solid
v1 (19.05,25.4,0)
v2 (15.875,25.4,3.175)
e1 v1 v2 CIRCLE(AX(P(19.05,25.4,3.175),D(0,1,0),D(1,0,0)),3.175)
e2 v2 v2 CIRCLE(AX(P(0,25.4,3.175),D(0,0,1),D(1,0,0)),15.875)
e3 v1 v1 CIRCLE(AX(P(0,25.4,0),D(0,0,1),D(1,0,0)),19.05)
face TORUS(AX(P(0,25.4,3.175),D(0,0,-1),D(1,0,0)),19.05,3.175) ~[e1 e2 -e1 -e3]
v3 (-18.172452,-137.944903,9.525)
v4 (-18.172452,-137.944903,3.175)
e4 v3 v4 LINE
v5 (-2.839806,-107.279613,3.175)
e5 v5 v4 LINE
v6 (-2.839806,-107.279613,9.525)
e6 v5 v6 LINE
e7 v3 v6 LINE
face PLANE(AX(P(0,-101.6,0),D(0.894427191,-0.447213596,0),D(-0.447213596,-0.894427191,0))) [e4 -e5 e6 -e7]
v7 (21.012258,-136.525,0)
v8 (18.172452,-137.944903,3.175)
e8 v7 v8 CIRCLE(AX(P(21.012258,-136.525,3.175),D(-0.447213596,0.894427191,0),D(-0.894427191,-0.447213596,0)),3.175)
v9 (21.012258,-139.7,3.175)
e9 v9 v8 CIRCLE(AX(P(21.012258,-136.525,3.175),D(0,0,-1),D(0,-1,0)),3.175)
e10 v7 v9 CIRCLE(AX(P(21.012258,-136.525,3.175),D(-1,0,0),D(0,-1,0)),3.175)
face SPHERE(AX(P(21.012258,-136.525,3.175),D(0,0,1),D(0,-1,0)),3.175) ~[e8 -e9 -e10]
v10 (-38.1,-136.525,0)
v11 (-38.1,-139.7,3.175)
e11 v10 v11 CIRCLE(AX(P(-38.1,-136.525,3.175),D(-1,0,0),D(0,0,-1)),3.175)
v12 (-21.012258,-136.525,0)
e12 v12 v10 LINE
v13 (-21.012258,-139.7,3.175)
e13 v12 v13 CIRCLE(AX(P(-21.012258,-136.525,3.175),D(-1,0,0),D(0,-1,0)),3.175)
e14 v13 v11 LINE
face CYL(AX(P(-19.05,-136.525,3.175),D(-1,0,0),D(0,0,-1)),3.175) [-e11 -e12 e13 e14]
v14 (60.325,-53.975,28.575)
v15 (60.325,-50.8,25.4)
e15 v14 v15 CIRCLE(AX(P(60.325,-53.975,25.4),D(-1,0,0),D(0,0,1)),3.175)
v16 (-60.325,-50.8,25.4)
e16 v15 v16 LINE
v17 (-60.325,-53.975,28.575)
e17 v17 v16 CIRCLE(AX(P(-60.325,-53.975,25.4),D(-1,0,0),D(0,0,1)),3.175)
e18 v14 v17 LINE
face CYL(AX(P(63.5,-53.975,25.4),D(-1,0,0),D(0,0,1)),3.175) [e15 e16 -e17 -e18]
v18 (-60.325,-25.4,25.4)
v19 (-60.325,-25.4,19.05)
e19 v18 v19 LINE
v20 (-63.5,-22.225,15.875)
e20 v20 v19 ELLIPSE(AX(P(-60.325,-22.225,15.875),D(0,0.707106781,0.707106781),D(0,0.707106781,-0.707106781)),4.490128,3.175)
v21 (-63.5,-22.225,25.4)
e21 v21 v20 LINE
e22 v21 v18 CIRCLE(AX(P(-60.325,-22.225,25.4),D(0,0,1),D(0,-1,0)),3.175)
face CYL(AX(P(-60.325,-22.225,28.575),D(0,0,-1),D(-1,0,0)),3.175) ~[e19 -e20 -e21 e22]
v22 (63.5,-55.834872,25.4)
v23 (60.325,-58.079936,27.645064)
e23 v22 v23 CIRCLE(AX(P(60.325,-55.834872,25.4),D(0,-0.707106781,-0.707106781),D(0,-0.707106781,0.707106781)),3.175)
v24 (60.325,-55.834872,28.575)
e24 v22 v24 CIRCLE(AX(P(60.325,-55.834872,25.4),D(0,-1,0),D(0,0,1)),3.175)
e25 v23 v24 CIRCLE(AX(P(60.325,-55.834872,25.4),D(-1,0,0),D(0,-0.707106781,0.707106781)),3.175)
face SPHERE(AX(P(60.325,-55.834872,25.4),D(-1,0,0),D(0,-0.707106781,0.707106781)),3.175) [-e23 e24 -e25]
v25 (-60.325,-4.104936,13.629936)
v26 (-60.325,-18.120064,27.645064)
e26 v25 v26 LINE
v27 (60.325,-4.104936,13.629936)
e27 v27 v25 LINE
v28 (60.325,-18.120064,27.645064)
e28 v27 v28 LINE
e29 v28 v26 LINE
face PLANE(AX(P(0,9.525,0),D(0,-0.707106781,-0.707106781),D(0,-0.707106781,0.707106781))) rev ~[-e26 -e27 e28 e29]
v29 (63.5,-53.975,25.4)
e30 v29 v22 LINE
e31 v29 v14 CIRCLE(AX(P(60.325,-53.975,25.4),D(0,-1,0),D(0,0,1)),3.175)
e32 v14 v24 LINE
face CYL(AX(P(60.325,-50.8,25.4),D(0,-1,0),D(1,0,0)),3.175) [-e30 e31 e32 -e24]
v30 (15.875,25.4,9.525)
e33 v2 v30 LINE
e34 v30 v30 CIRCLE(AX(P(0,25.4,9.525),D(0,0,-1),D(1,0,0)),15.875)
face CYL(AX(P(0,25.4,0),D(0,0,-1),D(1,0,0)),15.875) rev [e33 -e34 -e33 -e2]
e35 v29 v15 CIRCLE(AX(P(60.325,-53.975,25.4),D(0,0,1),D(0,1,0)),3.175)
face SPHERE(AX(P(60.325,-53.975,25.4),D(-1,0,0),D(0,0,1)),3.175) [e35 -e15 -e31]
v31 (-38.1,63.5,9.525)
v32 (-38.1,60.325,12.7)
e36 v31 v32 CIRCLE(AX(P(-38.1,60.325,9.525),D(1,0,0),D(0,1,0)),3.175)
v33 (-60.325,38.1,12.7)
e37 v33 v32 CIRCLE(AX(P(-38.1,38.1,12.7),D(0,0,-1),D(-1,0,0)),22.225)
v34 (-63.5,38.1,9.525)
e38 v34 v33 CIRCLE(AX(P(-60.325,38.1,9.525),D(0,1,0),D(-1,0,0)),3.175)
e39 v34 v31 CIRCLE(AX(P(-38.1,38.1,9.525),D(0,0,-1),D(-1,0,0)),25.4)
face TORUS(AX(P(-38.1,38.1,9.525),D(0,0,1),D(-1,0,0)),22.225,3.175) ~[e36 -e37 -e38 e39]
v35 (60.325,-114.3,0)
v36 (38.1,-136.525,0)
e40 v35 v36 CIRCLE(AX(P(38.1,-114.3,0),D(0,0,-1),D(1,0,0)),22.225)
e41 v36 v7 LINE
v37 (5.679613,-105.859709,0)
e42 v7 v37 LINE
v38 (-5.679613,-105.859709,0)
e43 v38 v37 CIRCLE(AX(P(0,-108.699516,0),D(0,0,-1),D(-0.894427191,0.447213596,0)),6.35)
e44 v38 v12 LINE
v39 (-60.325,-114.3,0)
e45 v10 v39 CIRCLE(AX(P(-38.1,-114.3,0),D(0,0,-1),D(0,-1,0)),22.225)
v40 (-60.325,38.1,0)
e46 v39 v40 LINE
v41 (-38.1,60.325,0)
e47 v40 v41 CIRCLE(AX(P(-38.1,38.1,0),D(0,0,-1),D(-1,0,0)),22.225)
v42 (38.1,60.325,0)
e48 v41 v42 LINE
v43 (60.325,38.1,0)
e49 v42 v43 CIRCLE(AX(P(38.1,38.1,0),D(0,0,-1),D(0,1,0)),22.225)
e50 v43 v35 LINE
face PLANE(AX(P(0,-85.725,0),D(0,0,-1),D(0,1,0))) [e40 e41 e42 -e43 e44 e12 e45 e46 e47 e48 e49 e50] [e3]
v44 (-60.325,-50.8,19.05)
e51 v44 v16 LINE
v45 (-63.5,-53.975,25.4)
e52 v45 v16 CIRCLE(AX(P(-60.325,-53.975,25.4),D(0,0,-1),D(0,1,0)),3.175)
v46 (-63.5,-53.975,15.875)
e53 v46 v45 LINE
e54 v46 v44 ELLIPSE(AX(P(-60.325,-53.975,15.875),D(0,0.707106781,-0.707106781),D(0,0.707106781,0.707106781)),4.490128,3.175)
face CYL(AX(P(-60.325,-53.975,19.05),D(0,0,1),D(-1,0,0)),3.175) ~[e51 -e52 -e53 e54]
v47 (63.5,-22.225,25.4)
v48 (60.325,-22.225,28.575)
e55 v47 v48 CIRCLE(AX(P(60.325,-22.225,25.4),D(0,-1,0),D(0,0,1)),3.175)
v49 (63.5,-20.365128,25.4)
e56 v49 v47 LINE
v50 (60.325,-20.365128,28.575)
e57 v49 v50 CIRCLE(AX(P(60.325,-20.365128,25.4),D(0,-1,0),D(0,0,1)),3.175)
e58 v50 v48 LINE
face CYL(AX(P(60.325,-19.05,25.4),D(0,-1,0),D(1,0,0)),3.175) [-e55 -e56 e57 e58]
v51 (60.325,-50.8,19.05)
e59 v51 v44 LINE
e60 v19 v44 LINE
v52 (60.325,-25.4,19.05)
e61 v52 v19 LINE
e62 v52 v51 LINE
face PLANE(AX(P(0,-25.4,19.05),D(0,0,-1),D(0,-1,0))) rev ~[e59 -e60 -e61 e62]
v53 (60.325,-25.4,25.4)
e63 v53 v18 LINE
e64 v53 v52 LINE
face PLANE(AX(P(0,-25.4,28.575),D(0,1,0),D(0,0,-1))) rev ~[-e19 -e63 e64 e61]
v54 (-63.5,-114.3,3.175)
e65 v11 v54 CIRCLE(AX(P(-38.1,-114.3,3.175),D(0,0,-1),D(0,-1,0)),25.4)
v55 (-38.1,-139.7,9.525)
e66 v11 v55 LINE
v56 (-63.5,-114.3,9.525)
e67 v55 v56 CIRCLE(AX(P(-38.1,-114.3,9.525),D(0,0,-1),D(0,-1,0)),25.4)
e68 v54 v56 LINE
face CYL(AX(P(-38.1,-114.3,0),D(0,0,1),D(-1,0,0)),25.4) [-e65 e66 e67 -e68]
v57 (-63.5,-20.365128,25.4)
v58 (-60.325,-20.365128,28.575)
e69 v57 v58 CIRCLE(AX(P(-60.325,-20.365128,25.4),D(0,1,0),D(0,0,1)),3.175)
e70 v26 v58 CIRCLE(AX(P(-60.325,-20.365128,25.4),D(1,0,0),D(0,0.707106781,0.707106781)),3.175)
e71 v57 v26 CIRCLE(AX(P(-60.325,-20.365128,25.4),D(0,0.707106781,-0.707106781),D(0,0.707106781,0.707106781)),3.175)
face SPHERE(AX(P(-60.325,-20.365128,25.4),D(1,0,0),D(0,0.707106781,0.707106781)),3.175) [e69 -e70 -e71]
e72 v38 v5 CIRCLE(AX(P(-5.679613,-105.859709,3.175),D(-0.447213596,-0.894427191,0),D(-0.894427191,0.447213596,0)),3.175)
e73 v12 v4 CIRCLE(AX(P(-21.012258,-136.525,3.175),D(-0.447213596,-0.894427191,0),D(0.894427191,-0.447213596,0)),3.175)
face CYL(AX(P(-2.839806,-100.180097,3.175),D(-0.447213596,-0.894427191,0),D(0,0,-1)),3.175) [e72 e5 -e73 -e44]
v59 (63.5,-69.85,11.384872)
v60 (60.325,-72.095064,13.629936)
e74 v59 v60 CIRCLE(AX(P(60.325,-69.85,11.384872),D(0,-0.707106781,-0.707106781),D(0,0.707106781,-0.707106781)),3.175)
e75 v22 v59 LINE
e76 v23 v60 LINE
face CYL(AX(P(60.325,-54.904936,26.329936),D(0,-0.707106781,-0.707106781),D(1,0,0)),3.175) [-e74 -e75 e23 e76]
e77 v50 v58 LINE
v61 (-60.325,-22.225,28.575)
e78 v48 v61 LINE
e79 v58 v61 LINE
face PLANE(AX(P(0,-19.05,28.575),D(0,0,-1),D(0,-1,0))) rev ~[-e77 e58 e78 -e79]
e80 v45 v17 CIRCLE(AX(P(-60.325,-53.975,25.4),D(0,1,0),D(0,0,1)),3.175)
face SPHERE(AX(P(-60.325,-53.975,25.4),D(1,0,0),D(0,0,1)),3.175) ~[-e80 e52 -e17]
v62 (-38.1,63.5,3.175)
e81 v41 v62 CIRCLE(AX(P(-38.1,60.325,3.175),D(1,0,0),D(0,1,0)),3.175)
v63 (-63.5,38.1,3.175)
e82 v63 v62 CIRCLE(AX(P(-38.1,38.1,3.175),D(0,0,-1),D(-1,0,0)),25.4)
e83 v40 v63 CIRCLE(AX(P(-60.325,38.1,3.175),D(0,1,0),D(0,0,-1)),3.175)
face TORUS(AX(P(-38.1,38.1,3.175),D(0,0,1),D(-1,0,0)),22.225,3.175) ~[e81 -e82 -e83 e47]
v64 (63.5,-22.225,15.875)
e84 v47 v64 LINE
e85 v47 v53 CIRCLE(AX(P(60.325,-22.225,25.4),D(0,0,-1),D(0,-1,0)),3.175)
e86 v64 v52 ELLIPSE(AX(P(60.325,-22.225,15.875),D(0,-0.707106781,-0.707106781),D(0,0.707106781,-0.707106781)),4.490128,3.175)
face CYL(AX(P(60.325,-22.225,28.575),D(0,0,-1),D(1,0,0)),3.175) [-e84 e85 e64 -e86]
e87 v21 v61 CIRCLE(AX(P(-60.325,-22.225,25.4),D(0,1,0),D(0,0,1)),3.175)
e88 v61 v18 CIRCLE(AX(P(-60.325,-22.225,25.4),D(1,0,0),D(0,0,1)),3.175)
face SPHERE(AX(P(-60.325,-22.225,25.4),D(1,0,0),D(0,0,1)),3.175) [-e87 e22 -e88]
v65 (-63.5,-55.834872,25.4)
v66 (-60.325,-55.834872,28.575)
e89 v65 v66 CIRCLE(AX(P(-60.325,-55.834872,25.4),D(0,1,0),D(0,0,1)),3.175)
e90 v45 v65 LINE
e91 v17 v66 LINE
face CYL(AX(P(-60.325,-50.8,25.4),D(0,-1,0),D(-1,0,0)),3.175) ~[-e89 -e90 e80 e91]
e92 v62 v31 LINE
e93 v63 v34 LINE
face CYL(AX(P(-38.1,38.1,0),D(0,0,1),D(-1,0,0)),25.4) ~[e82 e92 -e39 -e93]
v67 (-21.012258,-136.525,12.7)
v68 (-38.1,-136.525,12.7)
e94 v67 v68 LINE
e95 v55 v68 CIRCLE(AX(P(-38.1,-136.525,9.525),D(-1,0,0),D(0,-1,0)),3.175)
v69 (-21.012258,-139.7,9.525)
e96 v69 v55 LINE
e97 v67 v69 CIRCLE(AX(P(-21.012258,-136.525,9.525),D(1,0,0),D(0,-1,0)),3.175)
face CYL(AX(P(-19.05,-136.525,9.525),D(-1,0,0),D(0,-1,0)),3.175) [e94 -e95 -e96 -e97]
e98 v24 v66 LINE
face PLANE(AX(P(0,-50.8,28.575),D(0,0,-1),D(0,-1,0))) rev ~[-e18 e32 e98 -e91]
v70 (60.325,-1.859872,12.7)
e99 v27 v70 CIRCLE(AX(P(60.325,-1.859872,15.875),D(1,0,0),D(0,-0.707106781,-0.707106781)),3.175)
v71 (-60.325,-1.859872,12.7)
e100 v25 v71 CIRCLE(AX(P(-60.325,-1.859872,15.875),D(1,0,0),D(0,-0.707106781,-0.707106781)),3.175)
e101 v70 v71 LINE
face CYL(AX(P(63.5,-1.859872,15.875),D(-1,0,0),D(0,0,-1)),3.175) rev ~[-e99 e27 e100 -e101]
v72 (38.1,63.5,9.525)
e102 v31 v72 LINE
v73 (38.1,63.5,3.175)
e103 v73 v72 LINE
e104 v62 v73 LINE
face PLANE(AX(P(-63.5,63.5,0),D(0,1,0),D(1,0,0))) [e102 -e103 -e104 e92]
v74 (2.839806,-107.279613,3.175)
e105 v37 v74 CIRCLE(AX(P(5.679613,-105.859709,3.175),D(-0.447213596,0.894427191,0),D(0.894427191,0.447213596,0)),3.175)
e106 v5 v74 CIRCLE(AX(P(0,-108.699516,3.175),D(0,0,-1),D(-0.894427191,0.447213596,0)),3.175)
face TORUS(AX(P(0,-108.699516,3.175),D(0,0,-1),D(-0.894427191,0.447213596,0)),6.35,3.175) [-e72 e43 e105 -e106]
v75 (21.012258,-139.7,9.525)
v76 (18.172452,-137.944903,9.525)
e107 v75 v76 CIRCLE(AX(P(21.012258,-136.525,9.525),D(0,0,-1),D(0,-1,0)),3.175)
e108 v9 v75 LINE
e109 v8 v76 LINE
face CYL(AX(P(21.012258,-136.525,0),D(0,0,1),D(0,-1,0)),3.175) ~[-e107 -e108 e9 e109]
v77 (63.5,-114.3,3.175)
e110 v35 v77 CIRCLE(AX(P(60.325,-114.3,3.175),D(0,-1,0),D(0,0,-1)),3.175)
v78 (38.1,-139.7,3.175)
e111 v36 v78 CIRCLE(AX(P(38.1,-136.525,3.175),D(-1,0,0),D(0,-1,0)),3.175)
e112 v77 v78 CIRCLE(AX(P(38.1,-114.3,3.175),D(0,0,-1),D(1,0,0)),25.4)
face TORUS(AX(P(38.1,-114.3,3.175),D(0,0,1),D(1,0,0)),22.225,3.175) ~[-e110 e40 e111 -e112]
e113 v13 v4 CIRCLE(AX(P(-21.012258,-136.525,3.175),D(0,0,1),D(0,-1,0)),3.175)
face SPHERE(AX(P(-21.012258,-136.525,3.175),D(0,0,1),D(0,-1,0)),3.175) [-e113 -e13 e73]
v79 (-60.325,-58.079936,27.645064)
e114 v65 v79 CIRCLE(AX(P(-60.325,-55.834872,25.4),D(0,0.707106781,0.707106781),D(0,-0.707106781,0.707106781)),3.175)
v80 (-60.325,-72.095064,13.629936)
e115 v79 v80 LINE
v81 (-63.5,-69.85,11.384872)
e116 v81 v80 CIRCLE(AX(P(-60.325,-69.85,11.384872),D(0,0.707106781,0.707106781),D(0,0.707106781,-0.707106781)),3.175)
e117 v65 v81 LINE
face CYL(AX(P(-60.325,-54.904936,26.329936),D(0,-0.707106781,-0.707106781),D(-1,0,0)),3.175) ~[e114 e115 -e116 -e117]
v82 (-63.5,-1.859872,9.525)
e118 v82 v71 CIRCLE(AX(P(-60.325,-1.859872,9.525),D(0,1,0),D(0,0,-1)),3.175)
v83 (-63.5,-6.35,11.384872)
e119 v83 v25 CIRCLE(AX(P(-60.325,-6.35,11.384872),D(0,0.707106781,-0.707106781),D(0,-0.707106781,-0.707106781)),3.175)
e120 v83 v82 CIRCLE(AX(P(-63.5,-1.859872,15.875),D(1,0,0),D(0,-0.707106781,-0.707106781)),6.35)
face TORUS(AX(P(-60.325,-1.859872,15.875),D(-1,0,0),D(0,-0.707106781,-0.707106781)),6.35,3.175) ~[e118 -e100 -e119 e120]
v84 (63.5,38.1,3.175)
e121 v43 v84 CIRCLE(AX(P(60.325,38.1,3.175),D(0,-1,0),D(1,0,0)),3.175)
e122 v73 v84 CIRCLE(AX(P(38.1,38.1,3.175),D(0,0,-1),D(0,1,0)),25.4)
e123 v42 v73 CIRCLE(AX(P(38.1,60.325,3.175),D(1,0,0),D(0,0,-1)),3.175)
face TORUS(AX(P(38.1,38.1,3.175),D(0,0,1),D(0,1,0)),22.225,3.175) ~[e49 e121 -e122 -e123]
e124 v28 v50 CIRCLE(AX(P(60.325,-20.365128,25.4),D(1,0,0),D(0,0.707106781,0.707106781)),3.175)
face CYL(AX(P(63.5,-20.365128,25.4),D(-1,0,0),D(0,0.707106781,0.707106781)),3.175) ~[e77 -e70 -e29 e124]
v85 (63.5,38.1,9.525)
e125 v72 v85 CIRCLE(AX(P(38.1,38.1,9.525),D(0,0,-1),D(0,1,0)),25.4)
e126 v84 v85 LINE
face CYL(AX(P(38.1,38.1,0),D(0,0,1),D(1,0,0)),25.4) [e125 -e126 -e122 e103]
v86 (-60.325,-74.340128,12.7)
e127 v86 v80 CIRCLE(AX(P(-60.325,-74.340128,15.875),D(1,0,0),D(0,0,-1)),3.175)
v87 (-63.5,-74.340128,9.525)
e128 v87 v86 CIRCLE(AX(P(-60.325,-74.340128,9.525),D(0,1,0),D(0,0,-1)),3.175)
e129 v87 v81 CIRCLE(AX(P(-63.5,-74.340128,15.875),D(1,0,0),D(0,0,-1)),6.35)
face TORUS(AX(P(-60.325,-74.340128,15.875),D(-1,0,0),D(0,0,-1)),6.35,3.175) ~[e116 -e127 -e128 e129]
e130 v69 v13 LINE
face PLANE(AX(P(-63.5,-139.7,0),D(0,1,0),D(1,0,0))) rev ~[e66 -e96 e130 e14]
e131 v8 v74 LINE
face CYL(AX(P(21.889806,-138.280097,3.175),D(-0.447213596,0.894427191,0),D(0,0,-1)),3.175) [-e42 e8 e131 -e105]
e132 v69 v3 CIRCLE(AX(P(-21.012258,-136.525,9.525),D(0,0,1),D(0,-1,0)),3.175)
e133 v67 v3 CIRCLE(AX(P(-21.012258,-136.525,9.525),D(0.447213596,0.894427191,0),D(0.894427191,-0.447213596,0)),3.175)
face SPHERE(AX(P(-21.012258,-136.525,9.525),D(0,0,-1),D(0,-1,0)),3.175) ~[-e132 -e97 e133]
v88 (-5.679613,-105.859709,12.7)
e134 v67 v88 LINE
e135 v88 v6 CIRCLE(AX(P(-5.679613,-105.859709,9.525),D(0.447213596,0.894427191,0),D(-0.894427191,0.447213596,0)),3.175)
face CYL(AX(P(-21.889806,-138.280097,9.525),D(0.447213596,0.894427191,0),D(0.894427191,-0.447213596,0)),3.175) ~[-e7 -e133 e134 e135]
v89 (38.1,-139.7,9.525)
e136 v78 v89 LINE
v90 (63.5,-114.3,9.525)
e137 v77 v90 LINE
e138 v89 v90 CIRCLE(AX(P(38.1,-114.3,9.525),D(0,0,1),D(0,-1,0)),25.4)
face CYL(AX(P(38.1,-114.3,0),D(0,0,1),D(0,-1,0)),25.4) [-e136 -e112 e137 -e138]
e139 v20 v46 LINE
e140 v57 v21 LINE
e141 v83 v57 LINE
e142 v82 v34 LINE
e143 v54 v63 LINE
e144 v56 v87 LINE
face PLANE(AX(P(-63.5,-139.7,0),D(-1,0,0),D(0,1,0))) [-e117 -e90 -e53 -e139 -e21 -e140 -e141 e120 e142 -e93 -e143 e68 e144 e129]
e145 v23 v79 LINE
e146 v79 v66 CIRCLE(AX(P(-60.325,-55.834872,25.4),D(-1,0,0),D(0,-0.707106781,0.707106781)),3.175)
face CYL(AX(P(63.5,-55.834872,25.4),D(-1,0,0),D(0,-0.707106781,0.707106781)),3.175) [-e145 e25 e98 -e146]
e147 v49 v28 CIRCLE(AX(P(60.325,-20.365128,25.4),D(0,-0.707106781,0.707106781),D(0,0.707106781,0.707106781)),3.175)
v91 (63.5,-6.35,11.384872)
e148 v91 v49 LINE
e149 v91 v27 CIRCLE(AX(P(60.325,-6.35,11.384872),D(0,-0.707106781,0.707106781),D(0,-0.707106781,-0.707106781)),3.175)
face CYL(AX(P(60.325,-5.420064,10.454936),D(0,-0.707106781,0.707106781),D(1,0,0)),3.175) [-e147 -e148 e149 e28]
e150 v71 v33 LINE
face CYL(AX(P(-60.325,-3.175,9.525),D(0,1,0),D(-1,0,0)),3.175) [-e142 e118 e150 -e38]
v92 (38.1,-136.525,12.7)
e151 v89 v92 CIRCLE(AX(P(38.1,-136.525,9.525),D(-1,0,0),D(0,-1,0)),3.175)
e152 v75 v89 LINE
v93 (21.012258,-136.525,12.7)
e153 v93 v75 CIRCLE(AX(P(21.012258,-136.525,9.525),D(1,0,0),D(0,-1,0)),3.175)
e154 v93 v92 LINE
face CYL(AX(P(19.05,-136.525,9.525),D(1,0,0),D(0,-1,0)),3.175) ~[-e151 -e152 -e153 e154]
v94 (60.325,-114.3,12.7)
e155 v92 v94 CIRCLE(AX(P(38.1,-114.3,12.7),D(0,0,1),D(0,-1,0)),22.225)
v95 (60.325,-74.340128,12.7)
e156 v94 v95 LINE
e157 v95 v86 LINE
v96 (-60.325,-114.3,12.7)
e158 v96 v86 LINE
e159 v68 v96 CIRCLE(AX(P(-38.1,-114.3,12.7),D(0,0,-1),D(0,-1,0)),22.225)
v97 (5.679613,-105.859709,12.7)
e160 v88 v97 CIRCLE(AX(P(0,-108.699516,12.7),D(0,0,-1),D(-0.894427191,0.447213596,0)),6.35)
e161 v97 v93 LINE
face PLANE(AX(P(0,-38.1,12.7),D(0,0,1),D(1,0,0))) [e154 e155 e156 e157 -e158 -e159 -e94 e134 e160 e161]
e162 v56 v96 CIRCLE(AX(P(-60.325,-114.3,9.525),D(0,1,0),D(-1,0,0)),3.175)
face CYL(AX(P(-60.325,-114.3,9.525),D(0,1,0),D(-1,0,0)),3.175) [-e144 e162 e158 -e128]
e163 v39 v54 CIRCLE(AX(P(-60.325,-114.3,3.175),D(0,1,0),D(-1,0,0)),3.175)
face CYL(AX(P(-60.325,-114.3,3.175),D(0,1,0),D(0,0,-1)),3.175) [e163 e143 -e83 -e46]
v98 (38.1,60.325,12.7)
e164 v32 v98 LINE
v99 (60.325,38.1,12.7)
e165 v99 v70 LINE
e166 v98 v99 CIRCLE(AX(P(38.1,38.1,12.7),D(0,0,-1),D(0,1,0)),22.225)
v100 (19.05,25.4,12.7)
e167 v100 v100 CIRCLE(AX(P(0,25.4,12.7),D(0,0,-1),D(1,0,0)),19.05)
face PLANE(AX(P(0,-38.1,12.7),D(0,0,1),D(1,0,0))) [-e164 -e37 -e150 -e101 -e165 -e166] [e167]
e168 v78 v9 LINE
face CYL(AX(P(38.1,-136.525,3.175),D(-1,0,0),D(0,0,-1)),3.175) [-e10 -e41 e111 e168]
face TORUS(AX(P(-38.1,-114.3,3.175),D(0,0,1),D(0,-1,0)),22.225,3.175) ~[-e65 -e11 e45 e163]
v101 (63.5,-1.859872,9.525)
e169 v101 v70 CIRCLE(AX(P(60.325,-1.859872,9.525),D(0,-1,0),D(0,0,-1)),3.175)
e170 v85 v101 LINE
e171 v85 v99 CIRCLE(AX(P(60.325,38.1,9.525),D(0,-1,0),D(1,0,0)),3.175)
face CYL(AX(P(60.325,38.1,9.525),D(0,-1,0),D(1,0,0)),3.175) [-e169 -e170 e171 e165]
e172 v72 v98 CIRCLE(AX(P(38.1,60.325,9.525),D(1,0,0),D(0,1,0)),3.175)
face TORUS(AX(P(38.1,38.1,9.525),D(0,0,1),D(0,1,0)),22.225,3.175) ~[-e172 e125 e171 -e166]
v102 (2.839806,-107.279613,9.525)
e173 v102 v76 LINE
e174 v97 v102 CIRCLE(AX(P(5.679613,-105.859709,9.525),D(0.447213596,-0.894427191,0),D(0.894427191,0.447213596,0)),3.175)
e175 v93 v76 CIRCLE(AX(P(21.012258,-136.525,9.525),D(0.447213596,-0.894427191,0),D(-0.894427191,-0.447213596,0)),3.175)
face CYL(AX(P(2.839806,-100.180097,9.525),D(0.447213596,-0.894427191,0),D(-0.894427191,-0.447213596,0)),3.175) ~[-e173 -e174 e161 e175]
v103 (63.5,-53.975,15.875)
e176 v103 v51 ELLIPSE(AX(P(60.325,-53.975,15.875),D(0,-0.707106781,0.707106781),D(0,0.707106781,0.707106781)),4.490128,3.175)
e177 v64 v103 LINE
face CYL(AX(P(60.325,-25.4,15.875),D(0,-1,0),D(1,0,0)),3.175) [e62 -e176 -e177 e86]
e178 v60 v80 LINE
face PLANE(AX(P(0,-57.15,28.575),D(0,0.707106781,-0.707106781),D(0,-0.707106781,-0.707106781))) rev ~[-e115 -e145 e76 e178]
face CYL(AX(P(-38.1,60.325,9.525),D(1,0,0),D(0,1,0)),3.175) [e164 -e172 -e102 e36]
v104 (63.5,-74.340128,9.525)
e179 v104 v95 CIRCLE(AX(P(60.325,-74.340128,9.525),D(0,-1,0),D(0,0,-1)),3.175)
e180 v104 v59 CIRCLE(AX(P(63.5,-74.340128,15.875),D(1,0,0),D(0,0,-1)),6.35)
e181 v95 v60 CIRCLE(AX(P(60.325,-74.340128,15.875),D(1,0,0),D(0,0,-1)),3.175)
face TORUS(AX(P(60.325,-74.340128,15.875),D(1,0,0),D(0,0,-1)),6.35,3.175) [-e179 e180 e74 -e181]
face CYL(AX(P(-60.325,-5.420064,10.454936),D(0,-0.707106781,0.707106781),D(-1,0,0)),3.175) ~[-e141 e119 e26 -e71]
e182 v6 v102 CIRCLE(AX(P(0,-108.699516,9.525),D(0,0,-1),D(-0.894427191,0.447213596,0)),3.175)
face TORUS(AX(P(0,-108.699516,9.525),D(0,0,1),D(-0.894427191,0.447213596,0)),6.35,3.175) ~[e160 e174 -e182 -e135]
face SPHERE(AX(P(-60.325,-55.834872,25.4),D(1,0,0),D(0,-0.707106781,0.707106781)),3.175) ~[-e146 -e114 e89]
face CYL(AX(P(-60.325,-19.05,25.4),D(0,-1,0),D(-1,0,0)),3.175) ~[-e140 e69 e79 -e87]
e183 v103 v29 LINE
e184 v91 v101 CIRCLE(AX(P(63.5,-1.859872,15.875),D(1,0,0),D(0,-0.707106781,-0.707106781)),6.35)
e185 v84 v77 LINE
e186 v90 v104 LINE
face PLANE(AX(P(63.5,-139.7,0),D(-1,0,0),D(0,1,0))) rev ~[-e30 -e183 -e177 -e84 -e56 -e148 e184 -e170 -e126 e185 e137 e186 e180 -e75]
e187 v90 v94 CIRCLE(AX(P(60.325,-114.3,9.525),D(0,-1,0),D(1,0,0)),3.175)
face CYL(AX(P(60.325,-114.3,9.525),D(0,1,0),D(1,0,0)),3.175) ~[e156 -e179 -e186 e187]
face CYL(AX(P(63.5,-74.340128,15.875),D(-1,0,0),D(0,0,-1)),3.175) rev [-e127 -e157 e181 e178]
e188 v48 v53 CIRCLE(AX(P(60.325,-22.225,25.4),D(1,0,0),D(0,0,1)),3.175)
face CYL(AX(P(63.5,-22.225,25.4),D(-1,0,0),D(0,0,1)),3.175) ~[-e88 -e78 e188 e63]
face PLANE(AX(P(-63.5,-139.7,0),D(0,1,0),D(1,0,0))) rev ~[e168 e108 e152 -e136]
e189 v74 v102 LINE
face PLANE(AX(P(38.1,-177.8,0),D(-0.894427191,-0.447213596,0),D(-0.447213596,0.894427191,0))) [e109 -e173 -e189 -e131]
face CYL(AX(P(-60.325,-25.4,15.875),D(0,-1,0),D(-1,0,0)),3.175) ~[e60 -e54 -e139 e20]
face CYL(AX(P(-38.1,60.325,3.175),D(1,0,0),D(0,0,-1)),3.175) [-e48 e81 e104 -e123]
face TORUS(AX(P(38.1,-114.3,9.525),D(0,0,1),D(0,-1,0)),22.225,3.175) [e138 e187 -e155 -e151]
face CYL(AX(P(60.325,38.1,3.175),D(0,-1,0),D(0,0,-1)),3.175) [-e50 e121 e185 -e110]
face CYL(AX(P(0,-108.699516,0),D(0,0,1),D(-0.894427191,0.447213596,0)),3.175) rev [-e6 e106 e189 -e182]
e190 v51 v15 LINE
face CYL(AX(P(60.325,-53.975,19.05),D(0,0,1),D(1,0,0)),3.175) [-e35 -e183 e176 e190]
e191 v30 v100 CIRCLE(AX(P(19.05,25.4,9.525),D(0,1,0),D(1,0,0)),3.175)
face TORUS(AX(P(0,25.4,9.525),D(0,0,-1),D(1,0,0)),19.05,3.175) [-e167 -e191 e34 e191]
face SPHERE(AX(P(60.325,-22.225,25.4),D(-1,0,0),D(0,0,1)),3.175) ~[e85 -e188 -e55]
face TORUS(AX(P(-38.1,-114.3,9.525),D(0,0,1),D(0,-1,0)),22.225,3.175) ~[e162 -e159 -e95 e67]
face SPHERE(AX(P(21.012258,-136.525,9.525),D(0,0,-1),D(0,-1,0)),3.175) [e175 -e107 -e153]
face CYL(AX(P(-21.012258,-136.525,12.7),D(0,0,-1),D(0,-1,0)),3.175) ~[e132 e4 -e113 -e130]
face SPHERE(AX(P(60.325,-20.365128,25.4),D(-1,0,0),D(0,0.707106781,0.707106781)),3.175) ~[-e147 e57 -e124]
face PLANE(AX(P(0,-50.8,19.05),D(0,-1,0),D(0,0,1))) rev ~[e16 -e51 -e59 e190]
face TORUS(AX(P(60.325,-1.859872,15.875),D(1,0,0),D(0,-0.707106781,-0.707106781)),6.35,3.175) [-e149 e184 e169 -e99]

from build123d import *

# Parameters (mm, degrees)
F0_W          = 127
F0_H          = 203.2
F1_DEPTH      = 12.7
F2_R          = 15.875
F3_DEPTH      = 25.4
F5_DEPTH      = 25.4
F7_DEPTH      = 63.5
F7_DEPTH_BACK = 63.5
F8_R          = 25.4
F9_R          = 3.175


# Not quite as in the source:
# - a feature of the source that left no trace in its solid (it failed there, or was rolled back) is left out
# - a feature names something its author has since deleted; it is built from what else it names


with BuildPart() as f1:
    # F0 (on Top) → F1 (new body)
    with BuildSketch(Plane.XY):
        with Locations((0, -38.1)):
            Rectangle(F0_W, F0_H)
    extrude(amount=F1_DEPTH)

    # F2 (on Top) → F3 (cut)
    with BuildSketch(Plane.XY):
        with Locations((0, 25.4)):
            Circle(F2_R)
    extrude(amount=F3_DEPTH, mode=Mode.SUBTRACT)

    # F4 (on Top) → F5 (cut)
    with BuildSketch(Plane.XY):
        Polygon((38.1, -177.8), (0, -101.6), (-38.1, -177.8), align=None)
    extrude(amount=F5_DEPTH, mode=Mode.SUBTRACT)

    # F6 (on Right) → F7 (join, two sides)
    with BuildSketch(Plane.YZ) as f7_sk:
        Polygon((9.525, 0), (-19.05, 28.575), (-25.4, 28.575), (-25.4, 19.05), (-50.8, 19.05), (-50.8, 28.575), (-57.15, 28.575), (-85.725, 0), align=None)
    extrude(amount=F7_DEPTH)
    extrude(f7_sk.sketch, amount=-F7_DEPTH_BACK)

    # F8
    f8_edges = [f1.edges().sort_by_distance(p)[0] for p in [
        (63.5, -139.7, 6.35),
        (-63.5, -139.7, 6.35),
        (-63.5, 63.5, 6.35),
        (63.5, 63.5, 6.35),
    ]]
    fillet(f8_edges, radius=F8_R)

    # F9
    f9_edges = [f1.edges().sort_by_distance(p)[0] for p in [
        (-19.05, -139.7, 6.35),
        (19.05, -139.7, 6.35),
        (0, -101.6, 6.35),
        (0, -50.8, 28.575),
        (0, -25.4, 28.575),
        (0, 63.5, 0),
        (0, 63.5, 12.7),
        (-63.5, -38.1, 0),
        (-56.060512, 56.060512, 0),
        (-56.060512, -132.260512, 0),
        (-28.575, -139.7, 0),
        (56.060512, 56.060512, 0),
        (-9.525, -120.65, 0),
        (63.5, -38.1, 0),
        (9.525, -120.65, 0),
        (56.060512, -132.260512, 0),
        (28.575, -139.7, 0),
        (-15.875, 25.4, 0),
        (56.060512, 56.060512, 12.7),
        (-56.060512, 56.060512, 12.7),
        (-63.5, 17.4625, 12.7),
        (0, -3.175, 12.7),
        (63.5, 17.4625, 12.7),
        (-15.875, 25.4, 12.7),
        (-63.5, -93.6625, 12.7),
        (-63.5, -11.1125, 20.6375),
        (-63.5, -65.0875, 20.6375),
        (-63.5, -22.225, 28.575),
        (-63.5, -53.975, 28.575),
        (-63.5, -25.4, 23.8125),
        (-63.5, -50.8, 23.8125),
        (-63.5, -38.1, 19.05),
        (-56.060512, -132.260512, 12.7),
        (-28.575, -139.7, 12.7),
        (-9.525, -120.65, 12.7),
        (63.5, -93.6625, 12.7),
        (63.5, -65.0875, 20.6375),
        (63.5, -11.1125, 20.6375),
        (63.5, -53.975, 28.575),
        (63.5, -22.225, 28.575),
        (63.5, -50.8, 23.8125),
        (63.5, -25.4, 23.8125),
        (63.5, -38.1, 19.05),
        (9.525, -120.65, 12.7),
        (56.060512, -132.260512, 12.7),
        (28.575, -139.7, 12.7),
        (0, -19.05, 28.575),
        (0, -73.025, 12.7),
        (0, -57.15, 28.575),
    ]]
    fillet(f9_edges, radius=F9_R)


solid = f1.part
